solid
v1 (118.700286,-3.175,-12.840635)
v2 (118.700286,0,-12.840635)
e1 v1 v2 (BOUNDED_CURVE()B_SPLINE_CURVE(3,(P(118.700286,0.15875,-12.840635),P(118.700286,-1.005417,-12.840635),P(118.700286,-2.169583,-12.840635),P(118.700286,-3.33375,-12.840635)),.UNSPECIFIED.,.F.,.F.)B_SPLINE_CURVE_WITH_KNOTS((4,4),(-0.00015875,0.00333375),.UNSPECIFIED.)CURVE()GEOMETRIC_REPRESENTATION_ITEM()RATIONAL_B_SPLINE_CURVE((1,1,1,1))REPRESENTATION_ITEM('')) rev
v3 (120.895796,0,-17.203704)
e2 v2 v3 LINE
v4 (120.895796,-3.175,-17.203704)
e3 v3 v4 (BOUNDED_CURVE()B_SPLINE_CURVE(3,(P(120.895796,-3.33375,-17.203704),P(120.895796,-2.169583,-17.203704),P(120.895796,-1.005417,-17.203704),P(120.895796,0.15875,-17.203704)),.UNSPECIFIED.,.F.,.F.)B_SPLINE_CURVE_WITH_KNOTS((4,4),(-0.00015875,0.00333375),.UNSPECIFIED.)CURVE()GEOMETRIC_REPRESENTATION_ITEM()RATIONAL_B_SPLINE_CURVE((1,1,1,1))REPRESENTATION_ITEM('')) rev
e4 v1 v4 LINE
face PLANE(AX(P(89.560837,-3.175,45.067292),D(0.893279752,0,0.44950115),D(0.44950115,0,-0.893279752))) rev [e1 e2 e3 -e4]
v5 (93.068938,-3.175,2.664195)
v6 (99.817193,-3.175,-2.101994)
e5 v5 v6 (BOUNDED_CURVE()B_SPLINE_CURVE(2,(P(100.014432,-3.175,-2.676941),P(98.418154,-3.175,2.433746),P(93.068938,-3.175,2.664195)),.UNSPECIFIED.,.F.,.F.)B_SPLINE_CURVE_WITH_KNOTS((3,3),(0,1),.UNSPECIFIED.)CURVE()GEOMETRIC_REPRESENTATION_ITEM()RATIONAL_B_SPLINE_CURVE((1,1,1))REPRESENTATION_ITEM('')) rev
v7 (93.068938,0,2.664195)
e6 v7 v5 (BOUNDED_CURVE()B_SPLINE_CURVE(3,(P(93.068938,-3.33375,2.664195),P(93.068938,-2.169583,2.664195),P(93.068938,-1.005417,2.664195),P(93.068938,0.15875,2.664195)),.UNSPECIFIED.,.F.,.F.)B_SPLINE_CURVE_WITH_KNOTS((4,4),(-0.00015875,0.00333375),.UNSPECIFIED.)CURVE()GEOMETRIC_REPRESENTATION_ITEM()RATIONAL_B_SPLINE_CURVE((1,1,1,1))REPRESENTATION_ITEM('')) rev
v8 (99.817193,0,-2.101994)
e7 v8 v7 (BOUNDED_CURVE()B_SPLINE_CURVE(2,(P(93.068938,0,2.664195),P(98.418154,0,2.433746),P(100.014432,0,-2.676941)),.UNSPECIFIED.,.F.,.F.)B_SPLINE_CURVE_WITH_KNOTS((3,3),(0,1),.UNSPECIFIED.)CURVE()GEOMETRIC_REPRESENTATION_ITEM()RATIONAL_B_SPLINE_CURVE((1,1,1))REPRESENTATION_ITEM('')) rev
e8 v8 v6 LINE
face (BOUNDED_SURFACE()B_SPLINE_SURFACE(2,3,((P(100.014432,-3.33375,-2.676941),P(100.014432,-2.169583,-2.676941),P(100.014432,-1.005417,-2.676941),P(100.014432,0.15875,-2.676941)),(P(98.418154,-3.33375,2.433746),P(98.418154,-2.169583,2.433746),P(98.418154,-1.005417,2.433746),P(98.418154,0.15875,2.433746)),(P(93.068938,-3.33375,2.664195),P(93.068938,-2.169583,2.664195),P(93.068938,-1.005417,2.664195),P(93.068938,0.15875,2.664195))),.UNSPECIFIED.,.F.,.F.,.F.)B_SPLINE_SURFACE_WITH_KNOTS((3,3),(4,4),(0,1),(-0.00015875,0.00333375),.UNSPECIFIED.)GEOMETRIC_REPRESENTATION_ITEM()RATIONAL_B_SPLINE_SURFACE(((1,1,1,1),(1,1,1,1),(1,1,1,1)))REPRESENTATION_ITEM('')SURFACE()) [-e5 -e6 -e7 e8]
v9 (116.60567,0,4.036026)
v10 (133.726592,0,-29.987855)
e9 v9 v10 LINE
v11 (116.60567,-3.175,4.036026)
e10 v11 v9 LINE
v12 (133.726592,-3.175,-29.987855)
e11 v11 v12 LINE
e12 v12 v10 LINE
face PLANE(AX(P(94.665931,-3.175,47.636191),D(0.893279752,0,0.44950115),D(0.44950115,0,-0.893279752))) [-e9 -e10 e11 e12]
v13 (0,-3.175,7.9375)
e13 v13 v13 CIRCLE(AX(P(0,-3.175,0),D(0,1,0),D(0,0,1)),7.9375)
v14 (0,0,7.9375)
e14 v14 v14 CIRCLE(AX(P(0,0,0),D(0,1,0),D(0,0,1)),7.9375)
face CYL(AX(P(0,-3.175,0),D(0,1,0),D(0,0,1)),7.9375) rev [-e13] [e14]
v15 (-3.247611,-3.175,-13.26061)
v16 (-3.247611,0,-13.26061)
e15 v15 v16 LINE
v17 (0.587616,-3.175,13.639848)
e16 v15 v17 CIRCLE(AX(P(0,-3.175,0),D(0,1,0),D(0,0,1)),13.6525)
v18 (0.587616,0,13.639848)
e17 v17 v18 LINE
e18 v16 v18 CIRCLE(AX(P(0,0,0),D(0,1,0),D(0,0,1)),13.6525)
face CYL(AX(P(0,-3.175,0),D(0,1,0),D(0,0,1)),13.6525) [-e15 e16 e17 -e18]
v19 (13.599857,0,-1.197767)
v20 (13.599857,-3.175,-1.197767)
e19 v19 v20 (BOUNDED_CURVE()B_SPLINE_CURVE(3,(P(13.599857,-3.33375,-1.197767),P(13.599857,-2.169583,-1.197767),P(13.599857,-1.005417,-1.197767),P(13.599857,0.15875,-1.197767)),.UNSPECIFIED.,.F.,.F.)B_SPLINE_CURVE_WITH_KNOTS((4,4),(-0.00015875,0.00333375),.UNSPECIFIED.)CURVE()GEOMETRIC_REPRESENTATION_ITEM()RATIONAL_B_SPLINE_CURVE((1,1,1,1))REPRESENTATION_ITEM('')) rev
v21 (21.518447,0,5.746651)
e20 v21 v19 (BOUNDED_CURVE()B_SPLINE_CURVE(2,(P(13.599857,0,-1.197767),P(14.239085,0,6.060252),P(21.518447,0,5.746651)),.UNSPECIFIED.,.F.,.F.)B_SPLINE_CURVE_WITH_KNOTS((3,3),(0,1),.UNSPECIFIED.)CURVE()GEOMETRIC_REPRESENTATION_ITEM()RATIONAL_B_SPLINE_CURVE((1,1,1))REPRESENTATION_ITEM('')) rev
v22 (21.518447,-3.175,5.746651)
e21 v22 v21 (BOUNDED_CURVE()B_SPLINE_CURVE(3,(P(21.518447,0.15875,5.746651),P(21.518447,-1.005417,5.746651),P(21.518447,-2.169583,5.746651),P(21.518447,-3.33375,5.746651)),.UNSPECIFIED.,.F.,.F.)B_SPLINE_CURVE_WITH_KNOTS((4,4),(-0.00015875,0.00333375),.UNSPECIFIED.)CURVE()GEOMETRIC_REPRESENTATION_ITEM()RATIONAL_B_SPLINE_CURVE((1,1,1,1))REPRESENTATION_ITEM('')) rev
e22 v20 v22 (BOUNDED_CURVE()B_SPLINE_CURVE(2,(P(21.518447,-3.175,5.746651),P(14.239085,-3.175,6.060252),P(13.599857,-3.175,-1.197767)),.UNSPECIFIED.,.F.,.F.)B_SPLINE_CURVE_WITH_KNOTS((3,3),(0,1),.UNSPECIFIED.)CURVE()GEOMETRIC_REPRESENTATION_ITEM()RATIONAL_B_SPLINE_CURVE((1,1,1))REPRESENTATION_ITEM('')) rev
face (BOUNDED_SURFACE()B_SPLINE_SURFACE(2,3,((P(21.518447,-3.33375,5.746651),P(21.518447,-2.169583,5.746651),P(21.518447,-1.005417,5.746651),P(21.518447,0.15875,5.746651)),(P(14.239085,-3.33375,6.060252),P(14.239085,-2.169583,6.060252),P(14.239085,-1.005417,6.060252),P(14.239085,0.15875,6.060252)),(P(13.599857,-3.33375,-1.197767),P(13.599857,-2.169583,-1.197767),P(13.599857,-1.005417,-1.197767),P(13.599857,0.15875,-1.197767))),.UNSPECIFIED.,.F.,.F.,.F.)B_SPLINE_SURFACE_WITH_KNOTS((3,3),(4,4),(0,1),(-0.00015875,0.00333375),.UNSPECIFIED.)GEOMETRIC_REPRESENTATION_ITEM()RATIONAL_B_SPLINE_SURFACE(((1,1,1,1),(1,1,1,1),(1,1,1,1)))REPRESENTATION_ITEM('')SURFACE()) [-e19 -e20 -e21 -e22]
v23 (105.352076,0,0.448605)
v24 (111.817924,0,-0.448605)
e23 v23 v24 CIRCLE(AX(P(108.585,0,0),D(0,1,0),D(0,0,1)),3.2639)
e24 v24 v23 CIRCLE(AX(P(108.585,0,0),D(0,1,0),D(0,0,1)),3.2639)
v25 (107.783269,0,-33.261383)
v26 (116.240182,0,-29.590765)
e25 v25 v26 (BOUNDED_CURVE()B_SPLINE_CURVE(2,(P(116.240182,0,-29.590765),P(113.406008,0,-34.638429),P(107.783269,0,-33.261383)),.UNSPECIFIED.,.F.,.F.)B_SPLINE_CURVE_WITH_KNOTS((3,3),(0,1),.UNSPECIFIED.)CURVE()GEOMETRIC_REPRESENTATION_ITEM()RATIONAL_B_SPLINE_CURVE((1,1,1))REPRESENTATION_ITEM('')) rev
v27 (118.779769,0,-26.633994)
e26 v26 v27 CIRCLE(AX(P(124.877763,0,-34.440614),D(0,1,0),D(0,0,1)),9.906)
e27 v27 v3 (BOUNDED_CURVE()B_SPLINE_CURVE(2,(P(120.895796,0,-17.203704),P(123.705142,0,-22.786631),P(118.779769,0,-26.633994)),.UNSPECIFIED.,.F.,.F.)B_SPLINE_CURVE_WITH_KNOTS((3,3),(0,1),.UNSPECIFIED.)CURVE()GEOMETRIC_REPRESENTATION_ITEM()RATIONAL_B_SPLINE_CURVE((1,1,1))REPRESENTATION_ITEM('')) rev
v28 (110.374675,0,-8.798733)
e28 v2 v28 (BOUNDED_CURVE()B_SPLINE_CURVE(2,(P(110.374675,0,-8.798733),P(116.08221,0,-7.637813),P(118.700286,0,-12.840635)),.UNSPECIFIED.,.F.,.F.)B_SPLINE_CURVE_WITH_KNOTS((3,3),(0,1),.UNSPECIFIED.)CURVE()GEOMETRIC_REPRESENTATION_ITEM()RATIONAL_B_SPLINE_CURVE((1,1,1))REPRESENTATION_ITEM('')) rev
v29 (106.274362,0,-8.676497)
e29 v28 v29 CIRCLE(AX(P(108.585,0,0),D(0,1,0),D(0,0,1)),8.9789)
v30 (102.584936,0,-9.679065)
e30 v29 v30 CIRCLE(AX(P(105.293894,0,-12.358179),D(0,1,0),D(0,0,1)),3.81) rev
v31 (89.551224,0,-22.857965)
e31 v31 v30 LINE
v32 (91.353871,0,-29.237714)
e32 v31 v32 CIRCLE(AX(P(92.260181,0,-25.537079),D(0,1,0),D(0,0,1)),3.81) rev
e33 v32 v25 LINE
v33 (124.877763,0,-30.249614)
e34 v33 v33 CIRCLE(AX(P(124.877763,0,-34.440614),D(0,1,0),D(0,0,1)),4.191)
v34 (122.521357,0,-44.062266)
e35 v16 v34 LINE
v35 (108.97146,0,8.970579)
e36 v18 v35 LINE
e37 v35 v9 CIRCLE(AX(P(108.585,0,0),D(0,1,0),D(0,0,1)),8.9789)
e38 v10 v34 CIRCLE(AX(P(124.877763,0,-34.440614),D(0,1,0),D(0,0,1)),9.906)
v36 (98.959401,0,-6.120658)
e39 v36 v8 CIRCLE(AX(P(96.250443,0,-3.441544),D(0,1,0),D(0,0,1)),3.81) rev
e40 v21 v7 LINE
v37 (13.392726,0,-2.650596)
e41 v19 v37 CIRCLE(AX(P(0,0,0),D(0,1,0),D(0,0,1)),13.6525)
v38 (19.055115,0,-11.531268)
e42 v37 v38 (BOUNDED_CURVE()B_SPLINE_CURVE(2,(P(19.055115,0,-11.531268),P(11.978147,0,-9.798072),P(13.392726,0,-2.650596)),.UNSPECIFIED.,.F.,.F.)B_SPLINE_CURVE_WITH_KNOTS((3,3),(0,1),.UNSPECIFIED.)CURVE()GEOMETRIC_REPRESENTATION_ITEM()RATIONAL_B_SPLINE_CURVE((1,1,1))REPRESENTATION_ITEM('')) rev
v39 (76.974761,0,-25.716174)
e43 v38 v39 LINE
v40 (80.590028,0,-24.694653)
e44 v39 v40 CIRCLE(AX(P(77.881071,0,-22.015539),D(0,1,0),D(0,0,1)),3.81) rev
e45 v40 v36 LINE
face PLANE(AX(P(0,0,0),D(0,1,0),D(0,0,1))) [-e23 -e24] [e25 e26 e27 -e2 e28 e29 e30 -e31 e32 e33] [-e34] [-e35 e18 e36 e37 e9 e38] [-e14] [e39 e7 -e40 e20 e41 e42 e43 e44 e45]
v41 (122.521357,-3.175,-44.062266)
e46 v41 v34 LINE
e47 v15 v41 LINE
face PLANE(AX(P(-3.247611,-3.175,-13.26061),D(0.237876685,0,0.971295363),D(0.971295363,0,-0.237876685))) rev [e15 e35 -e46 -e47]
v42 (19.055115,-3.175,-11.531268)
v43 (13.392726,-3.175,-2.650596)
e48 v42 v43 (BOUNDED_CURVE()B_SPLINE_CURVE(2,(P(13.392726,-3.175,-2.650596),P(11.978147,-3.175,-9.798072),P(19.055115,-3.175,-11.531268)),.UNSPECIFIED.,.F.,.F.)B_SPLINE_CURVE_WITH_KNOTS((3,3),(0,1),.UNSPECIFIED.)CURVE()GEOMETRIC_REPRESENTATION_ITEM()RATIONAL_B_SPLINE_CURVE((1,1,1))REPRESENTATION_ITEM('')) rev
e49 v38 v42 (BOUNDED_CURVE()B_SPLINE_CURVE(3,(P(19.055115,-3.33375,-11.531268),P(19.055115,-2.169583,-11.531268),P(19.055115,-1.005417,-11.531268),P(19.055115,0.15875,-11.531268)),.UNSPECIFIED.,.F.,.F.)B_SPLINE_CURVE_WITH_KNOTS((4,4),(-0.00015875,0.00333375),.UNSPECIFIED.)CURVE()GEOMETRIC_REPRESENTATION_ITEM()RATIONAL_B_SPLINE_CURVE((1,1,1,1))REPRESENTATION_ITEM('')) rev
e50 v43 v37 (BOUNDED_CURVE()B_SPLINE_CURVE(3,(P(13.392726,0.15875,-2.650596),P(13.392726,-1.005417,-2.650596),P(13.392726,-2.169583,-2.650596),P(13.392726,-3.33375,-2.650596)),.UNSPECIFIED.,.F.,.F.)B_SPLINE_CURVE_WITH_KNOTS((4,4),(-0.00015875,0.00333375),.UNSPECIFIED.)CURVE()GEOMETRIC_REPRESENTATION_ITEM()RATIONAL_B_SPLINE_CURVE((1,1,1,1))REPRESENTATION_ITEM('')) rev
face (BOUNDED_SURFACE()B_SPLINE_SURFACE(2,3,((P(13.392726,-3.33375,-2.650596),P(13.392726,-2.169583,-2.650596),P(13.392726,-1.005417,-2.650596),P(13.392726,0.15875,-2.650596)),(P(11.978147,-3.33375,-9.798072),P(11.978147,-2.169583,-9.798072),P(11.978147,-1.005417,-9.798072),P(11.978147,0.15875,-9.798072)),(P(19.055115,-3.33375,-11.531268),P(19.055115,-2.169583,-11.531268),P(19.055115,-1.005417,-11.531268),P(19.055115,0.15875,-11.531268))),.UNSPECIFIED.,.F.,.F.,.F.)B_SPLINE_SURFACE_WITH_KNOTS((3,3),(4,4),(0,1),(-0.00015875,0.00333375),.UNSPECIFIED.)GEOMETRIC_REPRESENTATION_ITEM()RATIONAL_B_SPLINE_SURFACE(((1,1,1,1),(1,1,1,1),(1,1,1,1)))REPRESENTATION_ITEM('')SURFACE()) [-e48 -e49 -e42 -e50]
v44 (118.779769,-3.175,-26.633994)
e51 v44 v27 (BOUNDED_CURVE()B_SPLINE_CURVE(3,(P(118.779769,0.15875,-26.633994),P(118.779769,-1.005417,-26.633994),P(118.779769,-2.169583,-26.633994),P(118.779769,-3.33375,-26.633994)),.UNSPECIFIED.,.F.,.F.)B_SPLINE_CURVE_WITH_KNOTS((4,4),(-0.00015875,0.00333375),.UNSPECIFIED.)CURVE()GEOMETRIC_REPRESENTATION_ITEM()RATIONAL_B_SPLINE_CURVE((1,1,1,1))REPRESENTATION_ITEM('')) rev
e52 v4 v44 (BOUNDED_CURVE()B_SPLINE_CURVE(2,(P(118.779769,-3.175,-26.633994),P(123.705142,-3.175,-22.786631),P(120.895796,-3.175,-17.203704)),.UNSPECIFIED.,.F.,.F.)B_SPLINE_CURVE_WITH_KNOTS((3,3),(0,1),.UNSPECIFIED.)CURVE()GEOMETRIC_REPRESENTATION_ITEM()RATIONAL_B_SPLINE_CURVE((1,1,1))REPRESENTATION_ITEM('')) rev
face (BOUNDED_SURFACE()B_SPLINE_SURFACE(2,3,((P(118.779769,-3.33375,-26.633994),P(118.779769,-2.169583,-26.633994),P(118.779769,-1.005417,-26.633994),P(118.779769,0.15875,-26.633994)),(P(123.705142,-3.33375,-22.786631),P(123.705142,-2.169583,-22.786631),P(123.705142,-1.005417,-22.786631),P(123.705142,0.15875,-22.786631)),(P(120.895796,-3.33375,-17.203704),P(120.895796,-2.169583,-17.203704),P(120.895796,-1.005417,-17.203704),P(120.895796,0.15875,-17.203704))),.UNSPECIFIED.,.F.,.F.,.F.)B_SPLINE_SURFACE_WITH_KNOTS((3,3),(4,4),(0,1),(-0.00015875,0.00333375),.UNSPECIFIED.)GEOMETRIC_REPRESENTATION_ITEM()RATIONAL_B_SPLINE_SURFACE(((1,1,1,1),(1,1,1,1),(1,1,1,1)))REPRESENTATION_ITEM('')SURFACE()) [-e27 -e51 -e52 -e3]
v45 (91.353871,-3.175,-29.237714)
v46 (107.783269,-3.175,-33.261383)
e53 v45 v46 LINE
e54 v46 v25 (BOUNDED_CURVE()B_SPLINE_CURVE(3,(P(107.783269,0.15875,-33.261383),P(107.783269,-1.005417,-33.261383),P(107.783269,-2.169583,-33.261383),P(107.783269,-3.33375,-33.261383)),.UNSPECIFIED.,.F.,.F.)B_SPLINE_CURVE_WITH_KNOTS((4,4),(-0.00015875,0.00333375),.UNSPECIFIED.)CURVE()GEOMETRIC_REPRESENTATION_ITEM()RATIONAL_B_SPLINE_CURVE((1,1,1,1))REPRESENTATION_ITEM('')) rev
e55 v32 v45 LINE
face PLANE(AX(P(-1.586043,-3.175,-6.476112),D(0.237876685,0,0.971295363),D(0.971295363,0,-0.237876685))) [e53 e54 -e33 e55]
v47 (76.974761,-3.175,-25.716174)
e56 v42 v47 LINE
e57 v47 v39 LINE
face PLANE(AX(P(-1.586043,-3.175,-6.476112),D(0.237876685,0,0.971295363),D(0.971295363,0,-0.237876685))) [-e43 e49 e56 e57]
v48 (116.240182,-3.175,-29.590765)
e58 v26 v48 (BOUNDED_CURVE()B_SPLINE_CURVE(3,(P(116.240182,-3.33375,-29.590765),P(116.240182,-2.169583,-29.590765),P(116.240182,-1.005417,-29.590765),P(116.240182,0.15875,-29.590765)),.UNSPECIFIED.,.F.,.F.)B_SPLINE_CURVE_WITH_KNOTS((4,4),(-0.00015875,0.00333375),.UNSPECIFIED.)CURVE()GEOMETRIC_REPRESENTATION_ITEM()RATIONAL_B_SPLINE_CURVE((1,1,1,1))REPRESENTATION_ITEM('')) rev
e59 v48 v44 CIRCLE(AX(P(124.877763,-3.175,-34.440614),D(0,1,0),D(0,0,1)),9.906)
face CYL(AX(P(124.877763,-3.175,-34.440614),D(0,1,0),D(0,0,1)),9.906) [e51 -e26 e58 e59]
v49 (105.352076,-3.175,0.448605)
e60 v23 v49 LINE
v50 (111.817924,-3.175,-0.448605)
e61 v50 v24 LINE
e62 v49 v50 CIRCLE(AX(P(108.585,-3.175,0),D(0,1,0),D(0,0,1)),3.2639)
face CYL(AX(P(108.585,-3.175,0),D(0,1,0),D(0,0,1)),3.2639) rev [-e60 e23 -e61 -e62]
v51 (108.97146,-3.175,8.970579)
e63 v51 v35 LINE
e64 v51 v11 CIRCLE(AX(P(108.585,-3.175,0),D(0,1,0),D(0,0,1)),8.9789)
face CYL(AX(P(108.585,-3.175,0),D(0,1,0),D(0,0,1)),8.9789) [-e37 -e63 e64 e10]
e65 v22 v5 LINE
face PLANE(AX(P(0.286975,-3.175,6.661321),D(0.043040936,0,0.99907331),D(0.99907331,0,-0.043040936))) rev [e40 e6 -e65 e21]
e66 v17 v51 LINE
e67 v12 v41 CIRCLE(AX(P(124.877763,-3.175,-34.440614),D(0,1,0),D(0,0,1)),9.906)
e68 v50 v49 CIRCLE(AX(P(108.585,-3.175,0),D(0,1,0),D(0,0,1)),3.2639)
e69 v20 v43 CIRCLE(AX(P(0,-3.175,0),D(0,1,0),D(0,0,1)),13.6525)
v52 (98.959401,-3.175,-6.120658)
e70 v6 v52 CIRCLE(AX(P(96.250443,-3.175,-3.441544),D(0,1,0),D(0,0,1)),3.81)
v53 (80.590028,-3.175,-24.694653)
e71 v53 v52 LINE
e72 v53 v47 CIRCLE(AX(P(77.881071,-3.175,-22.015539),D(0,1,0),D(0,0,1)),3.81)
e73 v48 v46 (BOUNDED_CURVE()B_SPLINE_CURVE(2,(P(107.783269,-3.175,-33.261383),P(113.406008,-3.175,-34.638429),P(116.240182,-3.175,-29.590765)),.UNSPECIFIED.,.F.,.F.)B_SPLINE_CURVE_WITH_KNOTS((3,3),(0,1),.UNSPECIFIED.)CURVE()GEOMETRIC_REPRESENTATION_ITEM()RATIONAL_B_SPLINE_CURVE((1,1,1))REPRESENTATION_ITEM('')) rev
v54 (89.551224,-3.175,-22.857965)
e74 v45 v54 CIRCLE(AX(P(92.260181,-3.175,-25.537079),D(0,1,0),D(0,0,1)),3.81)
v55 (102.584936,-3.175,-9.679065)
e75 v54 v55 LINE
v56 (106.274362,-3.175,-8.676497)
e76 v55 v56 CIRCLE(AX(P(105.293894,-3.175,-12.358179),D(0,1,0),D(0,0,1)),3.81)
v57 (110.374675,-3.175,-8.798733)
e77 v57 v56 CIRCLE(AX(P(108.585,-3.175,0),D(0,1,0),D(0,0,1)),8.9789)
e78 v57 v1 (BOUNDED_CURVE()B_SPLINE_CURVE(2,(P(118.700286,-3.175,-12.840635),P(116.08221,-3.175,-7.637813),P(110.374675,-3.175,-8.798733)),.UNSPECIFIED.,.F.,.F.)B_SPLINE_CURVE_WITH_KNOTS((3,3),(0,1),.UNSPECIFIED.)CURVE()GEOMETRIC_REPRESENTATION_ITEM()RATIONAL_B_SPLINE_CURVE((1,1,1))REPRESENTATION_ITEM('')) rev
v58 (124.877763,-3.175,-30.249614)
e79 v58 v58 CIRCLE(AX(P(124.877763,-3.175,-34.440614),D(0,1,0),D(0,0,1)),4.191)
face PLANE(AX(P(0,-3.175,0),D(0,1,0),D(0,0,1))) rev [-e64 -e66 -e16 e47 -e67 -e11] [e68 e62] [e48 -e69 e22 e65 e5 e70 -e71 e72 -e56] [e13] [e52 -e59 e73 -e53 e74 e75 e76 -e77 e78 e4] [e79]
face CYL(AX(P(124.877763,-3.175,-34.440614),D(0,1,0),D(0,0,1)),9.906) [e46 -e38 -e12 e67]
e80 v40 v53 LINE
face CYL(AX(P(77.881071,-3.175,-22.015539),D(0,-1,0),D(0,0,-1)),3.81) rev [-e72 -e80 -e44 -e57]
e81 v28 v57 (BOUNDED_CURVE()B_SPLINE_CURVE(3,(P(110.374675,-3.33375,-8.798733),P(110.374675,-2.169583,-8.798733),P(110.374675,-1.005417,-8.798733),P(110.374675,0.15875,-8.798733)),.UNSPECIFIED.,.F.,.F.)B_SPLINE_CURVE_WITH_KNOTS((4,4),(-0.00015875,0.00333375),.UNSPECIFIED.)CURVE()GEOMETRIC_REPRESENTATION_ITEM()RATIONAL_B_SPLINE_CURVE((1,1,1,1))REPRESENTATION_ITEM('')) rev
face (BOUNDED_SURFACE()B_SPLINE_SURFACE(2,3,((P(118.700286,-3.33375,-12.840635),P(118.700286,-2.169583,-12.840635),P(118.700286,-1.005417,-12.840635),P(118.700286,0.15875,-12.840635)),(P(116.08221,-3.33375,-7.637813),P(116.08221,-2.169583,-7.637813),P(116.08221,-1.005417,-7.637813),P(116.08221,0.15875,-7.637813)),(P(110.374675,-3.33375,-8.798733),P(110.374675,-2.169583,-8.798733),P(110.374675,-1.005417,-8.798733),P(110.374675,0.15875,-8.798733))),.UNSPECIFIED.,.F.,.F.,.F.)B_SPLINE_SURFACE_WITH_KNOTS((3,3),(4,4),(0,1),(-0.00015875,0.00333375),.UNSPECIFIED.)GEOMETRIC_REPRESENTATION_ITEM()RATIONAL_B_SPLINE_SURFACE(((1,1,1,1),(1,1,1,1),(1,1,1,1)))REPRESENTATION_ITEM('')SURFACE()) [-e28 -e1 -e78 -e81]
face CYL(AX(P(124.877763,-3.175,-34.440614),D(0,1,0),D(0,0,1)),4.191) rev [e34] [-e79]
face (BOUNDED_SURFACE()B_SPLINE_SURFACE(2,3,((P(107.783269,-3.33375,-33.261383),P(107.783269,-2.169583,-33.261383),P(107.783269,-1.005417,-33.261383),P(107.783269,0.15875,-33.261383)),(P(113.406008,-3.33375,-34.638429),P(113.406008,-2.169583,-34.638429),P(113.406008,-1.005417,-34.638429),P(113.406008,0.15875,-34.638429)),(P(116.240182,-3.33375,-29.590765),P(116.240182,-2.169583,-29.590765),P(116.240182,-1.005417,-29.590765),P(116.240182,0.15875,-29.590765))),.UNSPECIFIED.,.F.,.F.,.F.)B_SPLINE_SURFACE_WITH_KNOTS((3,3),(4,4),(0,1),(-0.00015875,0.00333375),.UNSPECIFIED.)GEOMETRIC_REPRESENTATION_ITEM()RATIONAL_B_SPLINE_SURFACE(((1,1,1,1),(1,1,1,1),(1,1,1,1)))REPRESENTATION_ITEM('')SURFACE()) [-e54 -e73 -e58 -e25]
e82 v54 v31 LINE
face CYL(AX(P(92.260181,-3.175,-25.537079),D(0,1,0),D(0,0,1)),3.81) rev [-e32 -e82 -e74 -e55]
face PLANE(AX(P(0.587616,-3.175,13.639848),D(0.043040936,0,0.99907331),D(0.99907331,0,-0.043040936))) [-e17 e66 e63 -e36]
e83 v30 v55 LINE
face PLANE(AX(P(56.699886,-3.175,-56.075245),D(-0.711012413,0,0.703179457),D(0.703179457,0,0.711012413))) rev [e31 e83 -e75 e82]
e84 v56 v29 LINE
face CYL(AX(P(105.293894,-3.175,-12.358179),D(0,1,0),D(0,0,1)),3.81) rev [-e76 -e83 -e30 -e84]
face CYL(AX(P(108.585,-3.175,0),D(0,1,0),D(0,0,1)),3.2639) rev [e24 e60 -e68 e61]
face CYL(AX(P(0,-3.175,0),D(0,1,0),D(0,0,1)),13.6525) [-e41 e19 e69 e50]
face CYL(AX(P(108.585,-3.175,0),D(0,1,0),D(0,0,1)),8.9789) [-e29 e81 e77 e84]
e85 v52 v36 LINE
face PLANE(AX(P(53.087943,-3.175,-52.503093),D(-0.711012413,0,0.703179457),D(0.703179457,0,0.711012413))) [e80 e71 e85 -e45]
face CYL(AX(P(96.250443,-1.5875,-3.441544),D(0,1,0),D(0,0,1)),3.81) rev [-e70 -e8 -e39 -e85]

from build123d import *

# Parameters (mm, degrees)
BOSS_EXTRUDE4_DEPTH = 3.175
FILLET2_R           = 3.81


with BuildPart() as part:
    # Sketch1 → Boss-Extrude4 (new body)
    with BuildSketch(Plane(origin=(0, 0, 0), x_dir=(1, 0, 0), z_dir=(0, 1, 0))):
        with BuildLine():
            ThreePointArc((134.783763158, 34.440613651), (130.992755953, 42.233924829), (122.521356715, 44.06226552))
            ThreePointArc((122.521356715, 44.06226552), (117.722413764, 41.291147284), (115.162703171, 36.376187325))
            Line((115.162703171, 36.376187325), (123.88082197, 38.511312519))
            ThreePointArc((123.88082197, 38.511312519), (127.464875494, 37.737783765), (129.068763158, 34.440613651))
            ThreePointArc((129.068763158, 34.440613651), (128.955414212, 33.4725006), (128.621498601, 32.556754332))
            Line((128.621498601, 32.556754332), (124.58688197, 24.538885311))
            ThreePointArc((124.58688197, 24.538885311), (129.950478116, 25.932006306), (133.726592386, 29.98785526))
            ThreePointArc((133.726592386, 29.98785526), (134.515847468, 32.152346439), (134.783763158, 34.440613651))
        make_face()
        with BuildLine():
            Line((123.88082197, 38.511312519), (115.162703171, 36.376187325))
            ThreePointArc((115.162703171, 36.376187325), (115.052676855, 35.70414645), (114.98908268, 35.026134276))
            ThreePointArc((114.98908268, 35.026134276), (117.127915131, 28.270630543), (123.232258698, 24.672238604))
            ThreePointArc((123.232258698, 24.672238604), (123.907277135, 24.582267295), (124.58688197, 24.538885311))
            Line((124.58688197, 24.538885311), (128.621498601, 32.556754332))
            ThreePointArc((128.621498601, 32.556754332), (121.5989813, 31.830236182), (123.88082197, 38.511312519))
        make_face()
        with BuildLine():
            Line((122.521356715, 44.06226552), (-3.247611444, 13.260609947))
            ThreePointArc((-3.247611444, 13.260609947), (3.178857668, 13.277259513), (8.900967118, 10.351982448))
            Line((8.900967118, 10.351982448), (70.354618788, 25.402389875))
            Line((70.354618788, 25.402389875), (78.030840873, 27.282347644))
            Line((78.030840873, 27.282347644), (83.782484894, 28.690963463))
            Line((83.782484894, 28.690963463), (115.162703171, 36.376187325))
            ThreePointArc((115.162703171, 36.376187325), (117.722413764, 41.291147284), (122.521356715, 44.06226552))
        make_face()
        with BuildLine():
            ThreePointArc((8.900967118, 10.351982448), (3.178857668, 13.277259513), (-3.247611444, 13.260609947))
            ThreePointArc((-3.247611444, 13.260609947), (-13.515826194, -1.926966151), (0.587616374, -13.639848359))
            ThreePointArc((0.587616374, -13.639848359), (3.65523919, -13.15408616), (6.533692532, -11.987560976))
            ThreePointArc((6.533692532, -11.987560976), (9.268219921, -10.024512744), (11.439307143, -7.452047258))
            Line((11.439307143, -7.452047258), (0.341637427, -7.930144395))
            ThreePointArc((0.341637427, -7.930144395), (-7.858038485, -1.120329158), (-1.888146188, 7.709656946))
            Line((-1.888146188, 7.709656946), (8.900967118, 10.351982448))
        make_face()
        with BuildLine():
            ThreePointArc((9.985636063, 9.310092839), (9.457659775, 9.845985366), (8.900967118, 10.351982448))
            Line((8.900967118, 10.351982448), (-1.888146188, 7.709656946))
            ThreePointArc((-1.888146188, 7.709656946), (4.899833971, 6.244640367), (7.9375, 0))
            ThreePointArc((7.9375, 0), (5.732174689, -5.490544562), (0.341637427, -7.930144395))
            Line((0.341637427, -7.930144395), (11.439307143, -7.452047258))
            ThreePointArc((11.439307143, -7.452047258), (11.832412595, -6.810636419), (12.189591197, -6.148546389))
            ThreePointArc((12.189591197, -6.148546389), (13.281738404, -3.160091963), (13.6525, 0))
            ThreePointArc((13.6525, 0), (12.702748769, 5.003092039), (9.985636063, 9.310092839))
        make_face()
        with BuildLine():
            Line((70.354618788, 25.402389875), (8.900967118, 10.351982448))
            ThreePointArc((8.900967118, 10.351982448), (9.457659775, 9.845985366), (9.985636063, 9.310092839))
            Line((9.985636063, 9.310092839), (69.18664036, 23.808811963))
            Line((69.18664036, 23.808811963), (70.354618788, 25.402389875))
        make_face()
        with BuildLine():
            ThreePointArc((12.189591197, -6.148546389), (11.832412595, -6.810636419), (11.439307143, -7.452047258))
            Line((11.439307143, -7.452047258), (47.410466333, -5.902378846))
            Line((47.410466333, -5.902378846), (48.372525925, -4.589754505))
            Line((48.372525925, -4.589754505), (12.189591197, -6.148546389))
        make_face()
        with BuildLine():
            ThreePointArc((6.533692532, -11.987560976), (3.65523919, -13.15408616), (0.587616374, -13.639848359))
            Line((0.587616374, -13.639848359), (108.971460257, -8.970579339))
            ThreePointArc((108.971460257, -8.970579339), (108.77827491, -8.976819594), (108.585, -8.9789))
            ThreePointArc((108.585, -8.9789), (103.680463266, -7.521048108), (100.368568874, -3.620898335))
            Line((100.368568874, -3.620898335), (53.914169694, -5.622193724))
            Line((53.914169694, -5.622193724), (47.410466333, -5.902378846))
            Line((47.410466333, -5.902378846), (11.439307143, -7.452047258))
            ThreePointArc((11.439307143, -7.452047258), (9.268219921, -10.024512744), (6.533692532, -11.987560976))
        make_face()
        with BuildLine():
            Line((53.914169694, -5.622193724), (100.368568874, -3.620898335))
            ThreePointArc((100.368568874, -3.620898335), (100.12320514, -3.003110548), (99.924218758, -2.368863331))
            Line((99.924218758, -2.368863331), (54.876229285, -4.309569382))
            Line((54.876229285, -4.309569382), (53.914169694, -5.622193724))
        make_face()
        Polygon((48.372525925, -4.589754505), (47.410466333, -5.902378846), (53.914169694, -5.622193724), (54.876229285, -4.309569382), align=None)
        with BuildLine():
            Line((104.335087932, 7.90941797), (84.823475635, 27.638376771))
            Line((84.823475635, 27.638376771), (79.071831614, 26.229760952))
            Line((79.071831614, 26.229760952), (100.723144875, 4.337266328))
            ThreePointArc((100.723144875, 4.337266328), (102.271221973, 6.384109354), (104.335087932, 7.90941797))
        make_face()
        Polygon((78.030840873, 27.282347644), (70.354618788, 25.402389875), (69.18664036, 23.808811963), (76.862862445, 25.688769732), align=None)
        Polygon((84.823475635, 27.638376771), (83.782484894, 28.690963463), (78.030840873, 27.282347644), (79.071831614, 26.229760952), align=None)
        with BuildLine():
            ThreePointArc((114.98908268, 35.026134276), (115.052676855, 35.70414645), (115.162703171, 36.376187325))
            Line((115.162703171, 36.376187325), (83.782484894, 28.690963463))
            Line((83.782484894, 28.690963463), (84.823475635, 27.638376771))
            Line((84.823475635, 27.638376771), (114.98908268, 35.026134276))
        make_face()
        Polygon((79.071831614, 26.229760952), (78.030840873, 27.282347644), (76.862862445, 25.688769732), align=None)
        with BuildLine():
            Line((116.60566957, -4.036025875), (133.726592386, 29.98785526))
            ThreePointArc((133.726592386, 29.98785526), (129.950478116, 25.932006306), (124.58688197, 24.538885311))
            Line((124.58688197, 24.538885311), (115.260501822, 6.004858086))
            ThreePointArc((115.260501822, 6.004858086), (116.968296145, 3.21574112), (117.5639, 0))
            ThreePointArc((117.5639, 0), (117.321058471, -2.07410887), (116.60566957, -4.036025875))
        make_face()
        with BuildLine():
            ThreePointArc((108.585, -8.9789), (108.77827491, -8.976819594), (108.971460257, -8.970579339))
            ThreePointArc((108.971460257, -8.970579339), (113.459157615, -7.540771363), (116.60566957, -4.036025875))
            ThreePointArc((116.60566957, -4.036025875), (117.321058471, -2.07410887), (117.5639, 0))
            ThreePointArc((117.5639, 0), (116.968296145, 3.21574112), (115.260501822, 6.004858086))
            Line((115.260501822, 6.004858086), (111.500575784, -1.467126803))
            ThreePointArc((111.500575784, -1.467126803), (110.356794211, -2.741129053), (108.72548131, -3.260875375))
            Line((108.72548131, -3.260875375), (100.368568874, -3.620898335))
            ThreePointArc((100.368568874, -3.620898335), (103.680463266, -7.521048108), (108.585, -8.9789))
        make_face()
        with BuildLine():
            ThreePointArc((99.924218758, -2.368863331), (100.12320514, -3.003110548), (100.368568874, -3.620898335))
            Line((100.368568874, -3.620898335), (108.72548131, -3.260875375))
            ThreePointArc((108.72548131, -3.260875375), (106.227929768, 2.257711924), (111.8489, 0))
            ThreePointArc((111.8489, 0), (111.760625215, -0.75395471), (111.500575784, -1.467126803))
            Line((111.500575784, -1.467126803), (115.260501822, 6.004858086))
            ThreePointArc((115.260501822, 6.004858086), (114.79795902, 6.482266998), (114.301364272, 6.924147942))
            ThreePointArc((114.301364272, 6.924147942), (109.468351444, 8.935341932), (104.335087932, 7.90941797))
            ThreePointArc((104.335087932, 7.90941797), (102.271221973, 6.384109354), (100.723144875, 4.337266328))
            ThreePointArc((100.723144875, 4.337266328), (99.66914772, 1.062178575), (99.924218758, -2.368863331))
        make_face()
    extrude(amount=-BOSS_EXTRUDE4_DEPTH)

    # Fillet1
    # a fillet whose section is not a circle: 7.62 mm, written as the material it adds along each edge
    with BuildSketch(Plane(origin=(115.260501822, 0, -6.004858086), x_dir=(-0.8680919950979774, 0, -0.49640335217120884), z_dir=(0, -1, 0))) as fillet1_piece_1:
        with BuildLine():
            Bezier((5.628236023, 0), (0.097286133, 1.825453133), (0.407253439, 7.641603586), weights=[1, 1, 1])
            Line((0.407253439, 7.641603586), (0, 0))
            ThreePointArc((0, 0), (2.814118011, 0.452389282), (5.628236023, 0))
        make_face()
    extrude(amount=3.175)
    with BuildSketch(Plane(origin=(124.58688197, 0, -24.538885311), x_dir=(-0.940652377409321, 0, -0.3393716323946247), z_dir=(0, -1, 0))) as fillet1_piece_2:
        with BuildLine():
            Bezier((6.173495259, 0), (0.234745196, -1.947499202), (0.982676409, -8.152505596), weights=[1, 1, 1])
            Line((0.982676409, -8.152505596), (0, 0))
            ThreePointArc((0, 0), (3.08674763, -0.493198872), (6.173495259, 0))
        make_face()
    extrude(amount=3.175)
    with BuildSketch(Plane(origin=(114.98908268, 0, -35.026134276), x_dir=(0.22431195725050157, 0, 0.9745173912426853), z_dir=(0, -1, 0))) as fillet1_piece_3:
        with BuildLine():
            Bezier((5.577498608, 0), (0.022723171, 1.629700449), (0.103430981, 7.418045632), weights=[1, 1, 1])
            Line((0.103430981, 7.418045632), (0, 0))
            ThreePointArc((0, 0), (2.788749304, 0.400648175), (5.577498608, 0))
        make_face()
    extrude(amount=3.175)
    with BuildSketch(Plane(origin=(9.985636063, 0, -9.310092839), x_dir=(0.9712953632492297, 0, -0.23787668513443458), z_dir=(0, -1, 0))) as fillet1_piece_4:
        with BuildLine():
            Bezier((9.337508644, 0), (2.051395042, 0), (1.725151149, 7.27880597), weights=[1, 1, 1])
            ThreePointArc((1.725151149, 7.27880597), (1.370821683, 3.518943481), (0, 0))
            Line((0, 0), (9.337508644, 0))
        make_face()
    extrude(amount=3.175)
    with BuildSketch(Plane(origin=(99.924218758, 0, 2.368863331), x_dir=(-0.9990733095506228, 0, 0.04304093567251452), z_dir=(0, -1, 0))) as fillet1_piece_5:
        with BuildLine():
            Bezier((6.861639494, 0), (1.507461334, 0), (-0.307306015, 5.037245601), weights=[1, 1, 1])
            ThreePointArc((-0.307306015, 5.037245601), (0.207524079, 2.540657043), (0, 0))
            Line((0, 0), (6.861639494, 0))
        make_face()
    extrude(amount=3.175)
    with BuildSketch(Plane(origin=(12.189591197, 0, 6.148546389), x_dir=(0.18852682154069017, 0, -0.9820680412068018), z_dir=(0, -1, 0))) as fillet1_piece_6:
        with BuildLine():
            Bezier((7.480452048, 0), (0.473095274, 1.996096811), (2.153427849, 9.085803001), weights=[1, 1, 1])
            Line((2.153427849, 9.085803001), (0, 0))
            ThreePointArc((0, 0), (3.740226024, 0.522326142), (7.480452048, 0))
        make_face()
    extrude(amount=3.175)

    # Fillet2
    fillet2_edges = [part.edges().sort_by_distance(p)[0] for p in [
        (104.335087932, -1.5875, -7.90941797),
        (100.723144875, -1.5875, -4.337266328),
        (84.823475635, -1.5875, -27.638376771),
        (79.071831614, -1.5875, -26.229760952),
    ]]
    fillet(fillet2_edges, radius=FILLET2_R)


solid = part.part
